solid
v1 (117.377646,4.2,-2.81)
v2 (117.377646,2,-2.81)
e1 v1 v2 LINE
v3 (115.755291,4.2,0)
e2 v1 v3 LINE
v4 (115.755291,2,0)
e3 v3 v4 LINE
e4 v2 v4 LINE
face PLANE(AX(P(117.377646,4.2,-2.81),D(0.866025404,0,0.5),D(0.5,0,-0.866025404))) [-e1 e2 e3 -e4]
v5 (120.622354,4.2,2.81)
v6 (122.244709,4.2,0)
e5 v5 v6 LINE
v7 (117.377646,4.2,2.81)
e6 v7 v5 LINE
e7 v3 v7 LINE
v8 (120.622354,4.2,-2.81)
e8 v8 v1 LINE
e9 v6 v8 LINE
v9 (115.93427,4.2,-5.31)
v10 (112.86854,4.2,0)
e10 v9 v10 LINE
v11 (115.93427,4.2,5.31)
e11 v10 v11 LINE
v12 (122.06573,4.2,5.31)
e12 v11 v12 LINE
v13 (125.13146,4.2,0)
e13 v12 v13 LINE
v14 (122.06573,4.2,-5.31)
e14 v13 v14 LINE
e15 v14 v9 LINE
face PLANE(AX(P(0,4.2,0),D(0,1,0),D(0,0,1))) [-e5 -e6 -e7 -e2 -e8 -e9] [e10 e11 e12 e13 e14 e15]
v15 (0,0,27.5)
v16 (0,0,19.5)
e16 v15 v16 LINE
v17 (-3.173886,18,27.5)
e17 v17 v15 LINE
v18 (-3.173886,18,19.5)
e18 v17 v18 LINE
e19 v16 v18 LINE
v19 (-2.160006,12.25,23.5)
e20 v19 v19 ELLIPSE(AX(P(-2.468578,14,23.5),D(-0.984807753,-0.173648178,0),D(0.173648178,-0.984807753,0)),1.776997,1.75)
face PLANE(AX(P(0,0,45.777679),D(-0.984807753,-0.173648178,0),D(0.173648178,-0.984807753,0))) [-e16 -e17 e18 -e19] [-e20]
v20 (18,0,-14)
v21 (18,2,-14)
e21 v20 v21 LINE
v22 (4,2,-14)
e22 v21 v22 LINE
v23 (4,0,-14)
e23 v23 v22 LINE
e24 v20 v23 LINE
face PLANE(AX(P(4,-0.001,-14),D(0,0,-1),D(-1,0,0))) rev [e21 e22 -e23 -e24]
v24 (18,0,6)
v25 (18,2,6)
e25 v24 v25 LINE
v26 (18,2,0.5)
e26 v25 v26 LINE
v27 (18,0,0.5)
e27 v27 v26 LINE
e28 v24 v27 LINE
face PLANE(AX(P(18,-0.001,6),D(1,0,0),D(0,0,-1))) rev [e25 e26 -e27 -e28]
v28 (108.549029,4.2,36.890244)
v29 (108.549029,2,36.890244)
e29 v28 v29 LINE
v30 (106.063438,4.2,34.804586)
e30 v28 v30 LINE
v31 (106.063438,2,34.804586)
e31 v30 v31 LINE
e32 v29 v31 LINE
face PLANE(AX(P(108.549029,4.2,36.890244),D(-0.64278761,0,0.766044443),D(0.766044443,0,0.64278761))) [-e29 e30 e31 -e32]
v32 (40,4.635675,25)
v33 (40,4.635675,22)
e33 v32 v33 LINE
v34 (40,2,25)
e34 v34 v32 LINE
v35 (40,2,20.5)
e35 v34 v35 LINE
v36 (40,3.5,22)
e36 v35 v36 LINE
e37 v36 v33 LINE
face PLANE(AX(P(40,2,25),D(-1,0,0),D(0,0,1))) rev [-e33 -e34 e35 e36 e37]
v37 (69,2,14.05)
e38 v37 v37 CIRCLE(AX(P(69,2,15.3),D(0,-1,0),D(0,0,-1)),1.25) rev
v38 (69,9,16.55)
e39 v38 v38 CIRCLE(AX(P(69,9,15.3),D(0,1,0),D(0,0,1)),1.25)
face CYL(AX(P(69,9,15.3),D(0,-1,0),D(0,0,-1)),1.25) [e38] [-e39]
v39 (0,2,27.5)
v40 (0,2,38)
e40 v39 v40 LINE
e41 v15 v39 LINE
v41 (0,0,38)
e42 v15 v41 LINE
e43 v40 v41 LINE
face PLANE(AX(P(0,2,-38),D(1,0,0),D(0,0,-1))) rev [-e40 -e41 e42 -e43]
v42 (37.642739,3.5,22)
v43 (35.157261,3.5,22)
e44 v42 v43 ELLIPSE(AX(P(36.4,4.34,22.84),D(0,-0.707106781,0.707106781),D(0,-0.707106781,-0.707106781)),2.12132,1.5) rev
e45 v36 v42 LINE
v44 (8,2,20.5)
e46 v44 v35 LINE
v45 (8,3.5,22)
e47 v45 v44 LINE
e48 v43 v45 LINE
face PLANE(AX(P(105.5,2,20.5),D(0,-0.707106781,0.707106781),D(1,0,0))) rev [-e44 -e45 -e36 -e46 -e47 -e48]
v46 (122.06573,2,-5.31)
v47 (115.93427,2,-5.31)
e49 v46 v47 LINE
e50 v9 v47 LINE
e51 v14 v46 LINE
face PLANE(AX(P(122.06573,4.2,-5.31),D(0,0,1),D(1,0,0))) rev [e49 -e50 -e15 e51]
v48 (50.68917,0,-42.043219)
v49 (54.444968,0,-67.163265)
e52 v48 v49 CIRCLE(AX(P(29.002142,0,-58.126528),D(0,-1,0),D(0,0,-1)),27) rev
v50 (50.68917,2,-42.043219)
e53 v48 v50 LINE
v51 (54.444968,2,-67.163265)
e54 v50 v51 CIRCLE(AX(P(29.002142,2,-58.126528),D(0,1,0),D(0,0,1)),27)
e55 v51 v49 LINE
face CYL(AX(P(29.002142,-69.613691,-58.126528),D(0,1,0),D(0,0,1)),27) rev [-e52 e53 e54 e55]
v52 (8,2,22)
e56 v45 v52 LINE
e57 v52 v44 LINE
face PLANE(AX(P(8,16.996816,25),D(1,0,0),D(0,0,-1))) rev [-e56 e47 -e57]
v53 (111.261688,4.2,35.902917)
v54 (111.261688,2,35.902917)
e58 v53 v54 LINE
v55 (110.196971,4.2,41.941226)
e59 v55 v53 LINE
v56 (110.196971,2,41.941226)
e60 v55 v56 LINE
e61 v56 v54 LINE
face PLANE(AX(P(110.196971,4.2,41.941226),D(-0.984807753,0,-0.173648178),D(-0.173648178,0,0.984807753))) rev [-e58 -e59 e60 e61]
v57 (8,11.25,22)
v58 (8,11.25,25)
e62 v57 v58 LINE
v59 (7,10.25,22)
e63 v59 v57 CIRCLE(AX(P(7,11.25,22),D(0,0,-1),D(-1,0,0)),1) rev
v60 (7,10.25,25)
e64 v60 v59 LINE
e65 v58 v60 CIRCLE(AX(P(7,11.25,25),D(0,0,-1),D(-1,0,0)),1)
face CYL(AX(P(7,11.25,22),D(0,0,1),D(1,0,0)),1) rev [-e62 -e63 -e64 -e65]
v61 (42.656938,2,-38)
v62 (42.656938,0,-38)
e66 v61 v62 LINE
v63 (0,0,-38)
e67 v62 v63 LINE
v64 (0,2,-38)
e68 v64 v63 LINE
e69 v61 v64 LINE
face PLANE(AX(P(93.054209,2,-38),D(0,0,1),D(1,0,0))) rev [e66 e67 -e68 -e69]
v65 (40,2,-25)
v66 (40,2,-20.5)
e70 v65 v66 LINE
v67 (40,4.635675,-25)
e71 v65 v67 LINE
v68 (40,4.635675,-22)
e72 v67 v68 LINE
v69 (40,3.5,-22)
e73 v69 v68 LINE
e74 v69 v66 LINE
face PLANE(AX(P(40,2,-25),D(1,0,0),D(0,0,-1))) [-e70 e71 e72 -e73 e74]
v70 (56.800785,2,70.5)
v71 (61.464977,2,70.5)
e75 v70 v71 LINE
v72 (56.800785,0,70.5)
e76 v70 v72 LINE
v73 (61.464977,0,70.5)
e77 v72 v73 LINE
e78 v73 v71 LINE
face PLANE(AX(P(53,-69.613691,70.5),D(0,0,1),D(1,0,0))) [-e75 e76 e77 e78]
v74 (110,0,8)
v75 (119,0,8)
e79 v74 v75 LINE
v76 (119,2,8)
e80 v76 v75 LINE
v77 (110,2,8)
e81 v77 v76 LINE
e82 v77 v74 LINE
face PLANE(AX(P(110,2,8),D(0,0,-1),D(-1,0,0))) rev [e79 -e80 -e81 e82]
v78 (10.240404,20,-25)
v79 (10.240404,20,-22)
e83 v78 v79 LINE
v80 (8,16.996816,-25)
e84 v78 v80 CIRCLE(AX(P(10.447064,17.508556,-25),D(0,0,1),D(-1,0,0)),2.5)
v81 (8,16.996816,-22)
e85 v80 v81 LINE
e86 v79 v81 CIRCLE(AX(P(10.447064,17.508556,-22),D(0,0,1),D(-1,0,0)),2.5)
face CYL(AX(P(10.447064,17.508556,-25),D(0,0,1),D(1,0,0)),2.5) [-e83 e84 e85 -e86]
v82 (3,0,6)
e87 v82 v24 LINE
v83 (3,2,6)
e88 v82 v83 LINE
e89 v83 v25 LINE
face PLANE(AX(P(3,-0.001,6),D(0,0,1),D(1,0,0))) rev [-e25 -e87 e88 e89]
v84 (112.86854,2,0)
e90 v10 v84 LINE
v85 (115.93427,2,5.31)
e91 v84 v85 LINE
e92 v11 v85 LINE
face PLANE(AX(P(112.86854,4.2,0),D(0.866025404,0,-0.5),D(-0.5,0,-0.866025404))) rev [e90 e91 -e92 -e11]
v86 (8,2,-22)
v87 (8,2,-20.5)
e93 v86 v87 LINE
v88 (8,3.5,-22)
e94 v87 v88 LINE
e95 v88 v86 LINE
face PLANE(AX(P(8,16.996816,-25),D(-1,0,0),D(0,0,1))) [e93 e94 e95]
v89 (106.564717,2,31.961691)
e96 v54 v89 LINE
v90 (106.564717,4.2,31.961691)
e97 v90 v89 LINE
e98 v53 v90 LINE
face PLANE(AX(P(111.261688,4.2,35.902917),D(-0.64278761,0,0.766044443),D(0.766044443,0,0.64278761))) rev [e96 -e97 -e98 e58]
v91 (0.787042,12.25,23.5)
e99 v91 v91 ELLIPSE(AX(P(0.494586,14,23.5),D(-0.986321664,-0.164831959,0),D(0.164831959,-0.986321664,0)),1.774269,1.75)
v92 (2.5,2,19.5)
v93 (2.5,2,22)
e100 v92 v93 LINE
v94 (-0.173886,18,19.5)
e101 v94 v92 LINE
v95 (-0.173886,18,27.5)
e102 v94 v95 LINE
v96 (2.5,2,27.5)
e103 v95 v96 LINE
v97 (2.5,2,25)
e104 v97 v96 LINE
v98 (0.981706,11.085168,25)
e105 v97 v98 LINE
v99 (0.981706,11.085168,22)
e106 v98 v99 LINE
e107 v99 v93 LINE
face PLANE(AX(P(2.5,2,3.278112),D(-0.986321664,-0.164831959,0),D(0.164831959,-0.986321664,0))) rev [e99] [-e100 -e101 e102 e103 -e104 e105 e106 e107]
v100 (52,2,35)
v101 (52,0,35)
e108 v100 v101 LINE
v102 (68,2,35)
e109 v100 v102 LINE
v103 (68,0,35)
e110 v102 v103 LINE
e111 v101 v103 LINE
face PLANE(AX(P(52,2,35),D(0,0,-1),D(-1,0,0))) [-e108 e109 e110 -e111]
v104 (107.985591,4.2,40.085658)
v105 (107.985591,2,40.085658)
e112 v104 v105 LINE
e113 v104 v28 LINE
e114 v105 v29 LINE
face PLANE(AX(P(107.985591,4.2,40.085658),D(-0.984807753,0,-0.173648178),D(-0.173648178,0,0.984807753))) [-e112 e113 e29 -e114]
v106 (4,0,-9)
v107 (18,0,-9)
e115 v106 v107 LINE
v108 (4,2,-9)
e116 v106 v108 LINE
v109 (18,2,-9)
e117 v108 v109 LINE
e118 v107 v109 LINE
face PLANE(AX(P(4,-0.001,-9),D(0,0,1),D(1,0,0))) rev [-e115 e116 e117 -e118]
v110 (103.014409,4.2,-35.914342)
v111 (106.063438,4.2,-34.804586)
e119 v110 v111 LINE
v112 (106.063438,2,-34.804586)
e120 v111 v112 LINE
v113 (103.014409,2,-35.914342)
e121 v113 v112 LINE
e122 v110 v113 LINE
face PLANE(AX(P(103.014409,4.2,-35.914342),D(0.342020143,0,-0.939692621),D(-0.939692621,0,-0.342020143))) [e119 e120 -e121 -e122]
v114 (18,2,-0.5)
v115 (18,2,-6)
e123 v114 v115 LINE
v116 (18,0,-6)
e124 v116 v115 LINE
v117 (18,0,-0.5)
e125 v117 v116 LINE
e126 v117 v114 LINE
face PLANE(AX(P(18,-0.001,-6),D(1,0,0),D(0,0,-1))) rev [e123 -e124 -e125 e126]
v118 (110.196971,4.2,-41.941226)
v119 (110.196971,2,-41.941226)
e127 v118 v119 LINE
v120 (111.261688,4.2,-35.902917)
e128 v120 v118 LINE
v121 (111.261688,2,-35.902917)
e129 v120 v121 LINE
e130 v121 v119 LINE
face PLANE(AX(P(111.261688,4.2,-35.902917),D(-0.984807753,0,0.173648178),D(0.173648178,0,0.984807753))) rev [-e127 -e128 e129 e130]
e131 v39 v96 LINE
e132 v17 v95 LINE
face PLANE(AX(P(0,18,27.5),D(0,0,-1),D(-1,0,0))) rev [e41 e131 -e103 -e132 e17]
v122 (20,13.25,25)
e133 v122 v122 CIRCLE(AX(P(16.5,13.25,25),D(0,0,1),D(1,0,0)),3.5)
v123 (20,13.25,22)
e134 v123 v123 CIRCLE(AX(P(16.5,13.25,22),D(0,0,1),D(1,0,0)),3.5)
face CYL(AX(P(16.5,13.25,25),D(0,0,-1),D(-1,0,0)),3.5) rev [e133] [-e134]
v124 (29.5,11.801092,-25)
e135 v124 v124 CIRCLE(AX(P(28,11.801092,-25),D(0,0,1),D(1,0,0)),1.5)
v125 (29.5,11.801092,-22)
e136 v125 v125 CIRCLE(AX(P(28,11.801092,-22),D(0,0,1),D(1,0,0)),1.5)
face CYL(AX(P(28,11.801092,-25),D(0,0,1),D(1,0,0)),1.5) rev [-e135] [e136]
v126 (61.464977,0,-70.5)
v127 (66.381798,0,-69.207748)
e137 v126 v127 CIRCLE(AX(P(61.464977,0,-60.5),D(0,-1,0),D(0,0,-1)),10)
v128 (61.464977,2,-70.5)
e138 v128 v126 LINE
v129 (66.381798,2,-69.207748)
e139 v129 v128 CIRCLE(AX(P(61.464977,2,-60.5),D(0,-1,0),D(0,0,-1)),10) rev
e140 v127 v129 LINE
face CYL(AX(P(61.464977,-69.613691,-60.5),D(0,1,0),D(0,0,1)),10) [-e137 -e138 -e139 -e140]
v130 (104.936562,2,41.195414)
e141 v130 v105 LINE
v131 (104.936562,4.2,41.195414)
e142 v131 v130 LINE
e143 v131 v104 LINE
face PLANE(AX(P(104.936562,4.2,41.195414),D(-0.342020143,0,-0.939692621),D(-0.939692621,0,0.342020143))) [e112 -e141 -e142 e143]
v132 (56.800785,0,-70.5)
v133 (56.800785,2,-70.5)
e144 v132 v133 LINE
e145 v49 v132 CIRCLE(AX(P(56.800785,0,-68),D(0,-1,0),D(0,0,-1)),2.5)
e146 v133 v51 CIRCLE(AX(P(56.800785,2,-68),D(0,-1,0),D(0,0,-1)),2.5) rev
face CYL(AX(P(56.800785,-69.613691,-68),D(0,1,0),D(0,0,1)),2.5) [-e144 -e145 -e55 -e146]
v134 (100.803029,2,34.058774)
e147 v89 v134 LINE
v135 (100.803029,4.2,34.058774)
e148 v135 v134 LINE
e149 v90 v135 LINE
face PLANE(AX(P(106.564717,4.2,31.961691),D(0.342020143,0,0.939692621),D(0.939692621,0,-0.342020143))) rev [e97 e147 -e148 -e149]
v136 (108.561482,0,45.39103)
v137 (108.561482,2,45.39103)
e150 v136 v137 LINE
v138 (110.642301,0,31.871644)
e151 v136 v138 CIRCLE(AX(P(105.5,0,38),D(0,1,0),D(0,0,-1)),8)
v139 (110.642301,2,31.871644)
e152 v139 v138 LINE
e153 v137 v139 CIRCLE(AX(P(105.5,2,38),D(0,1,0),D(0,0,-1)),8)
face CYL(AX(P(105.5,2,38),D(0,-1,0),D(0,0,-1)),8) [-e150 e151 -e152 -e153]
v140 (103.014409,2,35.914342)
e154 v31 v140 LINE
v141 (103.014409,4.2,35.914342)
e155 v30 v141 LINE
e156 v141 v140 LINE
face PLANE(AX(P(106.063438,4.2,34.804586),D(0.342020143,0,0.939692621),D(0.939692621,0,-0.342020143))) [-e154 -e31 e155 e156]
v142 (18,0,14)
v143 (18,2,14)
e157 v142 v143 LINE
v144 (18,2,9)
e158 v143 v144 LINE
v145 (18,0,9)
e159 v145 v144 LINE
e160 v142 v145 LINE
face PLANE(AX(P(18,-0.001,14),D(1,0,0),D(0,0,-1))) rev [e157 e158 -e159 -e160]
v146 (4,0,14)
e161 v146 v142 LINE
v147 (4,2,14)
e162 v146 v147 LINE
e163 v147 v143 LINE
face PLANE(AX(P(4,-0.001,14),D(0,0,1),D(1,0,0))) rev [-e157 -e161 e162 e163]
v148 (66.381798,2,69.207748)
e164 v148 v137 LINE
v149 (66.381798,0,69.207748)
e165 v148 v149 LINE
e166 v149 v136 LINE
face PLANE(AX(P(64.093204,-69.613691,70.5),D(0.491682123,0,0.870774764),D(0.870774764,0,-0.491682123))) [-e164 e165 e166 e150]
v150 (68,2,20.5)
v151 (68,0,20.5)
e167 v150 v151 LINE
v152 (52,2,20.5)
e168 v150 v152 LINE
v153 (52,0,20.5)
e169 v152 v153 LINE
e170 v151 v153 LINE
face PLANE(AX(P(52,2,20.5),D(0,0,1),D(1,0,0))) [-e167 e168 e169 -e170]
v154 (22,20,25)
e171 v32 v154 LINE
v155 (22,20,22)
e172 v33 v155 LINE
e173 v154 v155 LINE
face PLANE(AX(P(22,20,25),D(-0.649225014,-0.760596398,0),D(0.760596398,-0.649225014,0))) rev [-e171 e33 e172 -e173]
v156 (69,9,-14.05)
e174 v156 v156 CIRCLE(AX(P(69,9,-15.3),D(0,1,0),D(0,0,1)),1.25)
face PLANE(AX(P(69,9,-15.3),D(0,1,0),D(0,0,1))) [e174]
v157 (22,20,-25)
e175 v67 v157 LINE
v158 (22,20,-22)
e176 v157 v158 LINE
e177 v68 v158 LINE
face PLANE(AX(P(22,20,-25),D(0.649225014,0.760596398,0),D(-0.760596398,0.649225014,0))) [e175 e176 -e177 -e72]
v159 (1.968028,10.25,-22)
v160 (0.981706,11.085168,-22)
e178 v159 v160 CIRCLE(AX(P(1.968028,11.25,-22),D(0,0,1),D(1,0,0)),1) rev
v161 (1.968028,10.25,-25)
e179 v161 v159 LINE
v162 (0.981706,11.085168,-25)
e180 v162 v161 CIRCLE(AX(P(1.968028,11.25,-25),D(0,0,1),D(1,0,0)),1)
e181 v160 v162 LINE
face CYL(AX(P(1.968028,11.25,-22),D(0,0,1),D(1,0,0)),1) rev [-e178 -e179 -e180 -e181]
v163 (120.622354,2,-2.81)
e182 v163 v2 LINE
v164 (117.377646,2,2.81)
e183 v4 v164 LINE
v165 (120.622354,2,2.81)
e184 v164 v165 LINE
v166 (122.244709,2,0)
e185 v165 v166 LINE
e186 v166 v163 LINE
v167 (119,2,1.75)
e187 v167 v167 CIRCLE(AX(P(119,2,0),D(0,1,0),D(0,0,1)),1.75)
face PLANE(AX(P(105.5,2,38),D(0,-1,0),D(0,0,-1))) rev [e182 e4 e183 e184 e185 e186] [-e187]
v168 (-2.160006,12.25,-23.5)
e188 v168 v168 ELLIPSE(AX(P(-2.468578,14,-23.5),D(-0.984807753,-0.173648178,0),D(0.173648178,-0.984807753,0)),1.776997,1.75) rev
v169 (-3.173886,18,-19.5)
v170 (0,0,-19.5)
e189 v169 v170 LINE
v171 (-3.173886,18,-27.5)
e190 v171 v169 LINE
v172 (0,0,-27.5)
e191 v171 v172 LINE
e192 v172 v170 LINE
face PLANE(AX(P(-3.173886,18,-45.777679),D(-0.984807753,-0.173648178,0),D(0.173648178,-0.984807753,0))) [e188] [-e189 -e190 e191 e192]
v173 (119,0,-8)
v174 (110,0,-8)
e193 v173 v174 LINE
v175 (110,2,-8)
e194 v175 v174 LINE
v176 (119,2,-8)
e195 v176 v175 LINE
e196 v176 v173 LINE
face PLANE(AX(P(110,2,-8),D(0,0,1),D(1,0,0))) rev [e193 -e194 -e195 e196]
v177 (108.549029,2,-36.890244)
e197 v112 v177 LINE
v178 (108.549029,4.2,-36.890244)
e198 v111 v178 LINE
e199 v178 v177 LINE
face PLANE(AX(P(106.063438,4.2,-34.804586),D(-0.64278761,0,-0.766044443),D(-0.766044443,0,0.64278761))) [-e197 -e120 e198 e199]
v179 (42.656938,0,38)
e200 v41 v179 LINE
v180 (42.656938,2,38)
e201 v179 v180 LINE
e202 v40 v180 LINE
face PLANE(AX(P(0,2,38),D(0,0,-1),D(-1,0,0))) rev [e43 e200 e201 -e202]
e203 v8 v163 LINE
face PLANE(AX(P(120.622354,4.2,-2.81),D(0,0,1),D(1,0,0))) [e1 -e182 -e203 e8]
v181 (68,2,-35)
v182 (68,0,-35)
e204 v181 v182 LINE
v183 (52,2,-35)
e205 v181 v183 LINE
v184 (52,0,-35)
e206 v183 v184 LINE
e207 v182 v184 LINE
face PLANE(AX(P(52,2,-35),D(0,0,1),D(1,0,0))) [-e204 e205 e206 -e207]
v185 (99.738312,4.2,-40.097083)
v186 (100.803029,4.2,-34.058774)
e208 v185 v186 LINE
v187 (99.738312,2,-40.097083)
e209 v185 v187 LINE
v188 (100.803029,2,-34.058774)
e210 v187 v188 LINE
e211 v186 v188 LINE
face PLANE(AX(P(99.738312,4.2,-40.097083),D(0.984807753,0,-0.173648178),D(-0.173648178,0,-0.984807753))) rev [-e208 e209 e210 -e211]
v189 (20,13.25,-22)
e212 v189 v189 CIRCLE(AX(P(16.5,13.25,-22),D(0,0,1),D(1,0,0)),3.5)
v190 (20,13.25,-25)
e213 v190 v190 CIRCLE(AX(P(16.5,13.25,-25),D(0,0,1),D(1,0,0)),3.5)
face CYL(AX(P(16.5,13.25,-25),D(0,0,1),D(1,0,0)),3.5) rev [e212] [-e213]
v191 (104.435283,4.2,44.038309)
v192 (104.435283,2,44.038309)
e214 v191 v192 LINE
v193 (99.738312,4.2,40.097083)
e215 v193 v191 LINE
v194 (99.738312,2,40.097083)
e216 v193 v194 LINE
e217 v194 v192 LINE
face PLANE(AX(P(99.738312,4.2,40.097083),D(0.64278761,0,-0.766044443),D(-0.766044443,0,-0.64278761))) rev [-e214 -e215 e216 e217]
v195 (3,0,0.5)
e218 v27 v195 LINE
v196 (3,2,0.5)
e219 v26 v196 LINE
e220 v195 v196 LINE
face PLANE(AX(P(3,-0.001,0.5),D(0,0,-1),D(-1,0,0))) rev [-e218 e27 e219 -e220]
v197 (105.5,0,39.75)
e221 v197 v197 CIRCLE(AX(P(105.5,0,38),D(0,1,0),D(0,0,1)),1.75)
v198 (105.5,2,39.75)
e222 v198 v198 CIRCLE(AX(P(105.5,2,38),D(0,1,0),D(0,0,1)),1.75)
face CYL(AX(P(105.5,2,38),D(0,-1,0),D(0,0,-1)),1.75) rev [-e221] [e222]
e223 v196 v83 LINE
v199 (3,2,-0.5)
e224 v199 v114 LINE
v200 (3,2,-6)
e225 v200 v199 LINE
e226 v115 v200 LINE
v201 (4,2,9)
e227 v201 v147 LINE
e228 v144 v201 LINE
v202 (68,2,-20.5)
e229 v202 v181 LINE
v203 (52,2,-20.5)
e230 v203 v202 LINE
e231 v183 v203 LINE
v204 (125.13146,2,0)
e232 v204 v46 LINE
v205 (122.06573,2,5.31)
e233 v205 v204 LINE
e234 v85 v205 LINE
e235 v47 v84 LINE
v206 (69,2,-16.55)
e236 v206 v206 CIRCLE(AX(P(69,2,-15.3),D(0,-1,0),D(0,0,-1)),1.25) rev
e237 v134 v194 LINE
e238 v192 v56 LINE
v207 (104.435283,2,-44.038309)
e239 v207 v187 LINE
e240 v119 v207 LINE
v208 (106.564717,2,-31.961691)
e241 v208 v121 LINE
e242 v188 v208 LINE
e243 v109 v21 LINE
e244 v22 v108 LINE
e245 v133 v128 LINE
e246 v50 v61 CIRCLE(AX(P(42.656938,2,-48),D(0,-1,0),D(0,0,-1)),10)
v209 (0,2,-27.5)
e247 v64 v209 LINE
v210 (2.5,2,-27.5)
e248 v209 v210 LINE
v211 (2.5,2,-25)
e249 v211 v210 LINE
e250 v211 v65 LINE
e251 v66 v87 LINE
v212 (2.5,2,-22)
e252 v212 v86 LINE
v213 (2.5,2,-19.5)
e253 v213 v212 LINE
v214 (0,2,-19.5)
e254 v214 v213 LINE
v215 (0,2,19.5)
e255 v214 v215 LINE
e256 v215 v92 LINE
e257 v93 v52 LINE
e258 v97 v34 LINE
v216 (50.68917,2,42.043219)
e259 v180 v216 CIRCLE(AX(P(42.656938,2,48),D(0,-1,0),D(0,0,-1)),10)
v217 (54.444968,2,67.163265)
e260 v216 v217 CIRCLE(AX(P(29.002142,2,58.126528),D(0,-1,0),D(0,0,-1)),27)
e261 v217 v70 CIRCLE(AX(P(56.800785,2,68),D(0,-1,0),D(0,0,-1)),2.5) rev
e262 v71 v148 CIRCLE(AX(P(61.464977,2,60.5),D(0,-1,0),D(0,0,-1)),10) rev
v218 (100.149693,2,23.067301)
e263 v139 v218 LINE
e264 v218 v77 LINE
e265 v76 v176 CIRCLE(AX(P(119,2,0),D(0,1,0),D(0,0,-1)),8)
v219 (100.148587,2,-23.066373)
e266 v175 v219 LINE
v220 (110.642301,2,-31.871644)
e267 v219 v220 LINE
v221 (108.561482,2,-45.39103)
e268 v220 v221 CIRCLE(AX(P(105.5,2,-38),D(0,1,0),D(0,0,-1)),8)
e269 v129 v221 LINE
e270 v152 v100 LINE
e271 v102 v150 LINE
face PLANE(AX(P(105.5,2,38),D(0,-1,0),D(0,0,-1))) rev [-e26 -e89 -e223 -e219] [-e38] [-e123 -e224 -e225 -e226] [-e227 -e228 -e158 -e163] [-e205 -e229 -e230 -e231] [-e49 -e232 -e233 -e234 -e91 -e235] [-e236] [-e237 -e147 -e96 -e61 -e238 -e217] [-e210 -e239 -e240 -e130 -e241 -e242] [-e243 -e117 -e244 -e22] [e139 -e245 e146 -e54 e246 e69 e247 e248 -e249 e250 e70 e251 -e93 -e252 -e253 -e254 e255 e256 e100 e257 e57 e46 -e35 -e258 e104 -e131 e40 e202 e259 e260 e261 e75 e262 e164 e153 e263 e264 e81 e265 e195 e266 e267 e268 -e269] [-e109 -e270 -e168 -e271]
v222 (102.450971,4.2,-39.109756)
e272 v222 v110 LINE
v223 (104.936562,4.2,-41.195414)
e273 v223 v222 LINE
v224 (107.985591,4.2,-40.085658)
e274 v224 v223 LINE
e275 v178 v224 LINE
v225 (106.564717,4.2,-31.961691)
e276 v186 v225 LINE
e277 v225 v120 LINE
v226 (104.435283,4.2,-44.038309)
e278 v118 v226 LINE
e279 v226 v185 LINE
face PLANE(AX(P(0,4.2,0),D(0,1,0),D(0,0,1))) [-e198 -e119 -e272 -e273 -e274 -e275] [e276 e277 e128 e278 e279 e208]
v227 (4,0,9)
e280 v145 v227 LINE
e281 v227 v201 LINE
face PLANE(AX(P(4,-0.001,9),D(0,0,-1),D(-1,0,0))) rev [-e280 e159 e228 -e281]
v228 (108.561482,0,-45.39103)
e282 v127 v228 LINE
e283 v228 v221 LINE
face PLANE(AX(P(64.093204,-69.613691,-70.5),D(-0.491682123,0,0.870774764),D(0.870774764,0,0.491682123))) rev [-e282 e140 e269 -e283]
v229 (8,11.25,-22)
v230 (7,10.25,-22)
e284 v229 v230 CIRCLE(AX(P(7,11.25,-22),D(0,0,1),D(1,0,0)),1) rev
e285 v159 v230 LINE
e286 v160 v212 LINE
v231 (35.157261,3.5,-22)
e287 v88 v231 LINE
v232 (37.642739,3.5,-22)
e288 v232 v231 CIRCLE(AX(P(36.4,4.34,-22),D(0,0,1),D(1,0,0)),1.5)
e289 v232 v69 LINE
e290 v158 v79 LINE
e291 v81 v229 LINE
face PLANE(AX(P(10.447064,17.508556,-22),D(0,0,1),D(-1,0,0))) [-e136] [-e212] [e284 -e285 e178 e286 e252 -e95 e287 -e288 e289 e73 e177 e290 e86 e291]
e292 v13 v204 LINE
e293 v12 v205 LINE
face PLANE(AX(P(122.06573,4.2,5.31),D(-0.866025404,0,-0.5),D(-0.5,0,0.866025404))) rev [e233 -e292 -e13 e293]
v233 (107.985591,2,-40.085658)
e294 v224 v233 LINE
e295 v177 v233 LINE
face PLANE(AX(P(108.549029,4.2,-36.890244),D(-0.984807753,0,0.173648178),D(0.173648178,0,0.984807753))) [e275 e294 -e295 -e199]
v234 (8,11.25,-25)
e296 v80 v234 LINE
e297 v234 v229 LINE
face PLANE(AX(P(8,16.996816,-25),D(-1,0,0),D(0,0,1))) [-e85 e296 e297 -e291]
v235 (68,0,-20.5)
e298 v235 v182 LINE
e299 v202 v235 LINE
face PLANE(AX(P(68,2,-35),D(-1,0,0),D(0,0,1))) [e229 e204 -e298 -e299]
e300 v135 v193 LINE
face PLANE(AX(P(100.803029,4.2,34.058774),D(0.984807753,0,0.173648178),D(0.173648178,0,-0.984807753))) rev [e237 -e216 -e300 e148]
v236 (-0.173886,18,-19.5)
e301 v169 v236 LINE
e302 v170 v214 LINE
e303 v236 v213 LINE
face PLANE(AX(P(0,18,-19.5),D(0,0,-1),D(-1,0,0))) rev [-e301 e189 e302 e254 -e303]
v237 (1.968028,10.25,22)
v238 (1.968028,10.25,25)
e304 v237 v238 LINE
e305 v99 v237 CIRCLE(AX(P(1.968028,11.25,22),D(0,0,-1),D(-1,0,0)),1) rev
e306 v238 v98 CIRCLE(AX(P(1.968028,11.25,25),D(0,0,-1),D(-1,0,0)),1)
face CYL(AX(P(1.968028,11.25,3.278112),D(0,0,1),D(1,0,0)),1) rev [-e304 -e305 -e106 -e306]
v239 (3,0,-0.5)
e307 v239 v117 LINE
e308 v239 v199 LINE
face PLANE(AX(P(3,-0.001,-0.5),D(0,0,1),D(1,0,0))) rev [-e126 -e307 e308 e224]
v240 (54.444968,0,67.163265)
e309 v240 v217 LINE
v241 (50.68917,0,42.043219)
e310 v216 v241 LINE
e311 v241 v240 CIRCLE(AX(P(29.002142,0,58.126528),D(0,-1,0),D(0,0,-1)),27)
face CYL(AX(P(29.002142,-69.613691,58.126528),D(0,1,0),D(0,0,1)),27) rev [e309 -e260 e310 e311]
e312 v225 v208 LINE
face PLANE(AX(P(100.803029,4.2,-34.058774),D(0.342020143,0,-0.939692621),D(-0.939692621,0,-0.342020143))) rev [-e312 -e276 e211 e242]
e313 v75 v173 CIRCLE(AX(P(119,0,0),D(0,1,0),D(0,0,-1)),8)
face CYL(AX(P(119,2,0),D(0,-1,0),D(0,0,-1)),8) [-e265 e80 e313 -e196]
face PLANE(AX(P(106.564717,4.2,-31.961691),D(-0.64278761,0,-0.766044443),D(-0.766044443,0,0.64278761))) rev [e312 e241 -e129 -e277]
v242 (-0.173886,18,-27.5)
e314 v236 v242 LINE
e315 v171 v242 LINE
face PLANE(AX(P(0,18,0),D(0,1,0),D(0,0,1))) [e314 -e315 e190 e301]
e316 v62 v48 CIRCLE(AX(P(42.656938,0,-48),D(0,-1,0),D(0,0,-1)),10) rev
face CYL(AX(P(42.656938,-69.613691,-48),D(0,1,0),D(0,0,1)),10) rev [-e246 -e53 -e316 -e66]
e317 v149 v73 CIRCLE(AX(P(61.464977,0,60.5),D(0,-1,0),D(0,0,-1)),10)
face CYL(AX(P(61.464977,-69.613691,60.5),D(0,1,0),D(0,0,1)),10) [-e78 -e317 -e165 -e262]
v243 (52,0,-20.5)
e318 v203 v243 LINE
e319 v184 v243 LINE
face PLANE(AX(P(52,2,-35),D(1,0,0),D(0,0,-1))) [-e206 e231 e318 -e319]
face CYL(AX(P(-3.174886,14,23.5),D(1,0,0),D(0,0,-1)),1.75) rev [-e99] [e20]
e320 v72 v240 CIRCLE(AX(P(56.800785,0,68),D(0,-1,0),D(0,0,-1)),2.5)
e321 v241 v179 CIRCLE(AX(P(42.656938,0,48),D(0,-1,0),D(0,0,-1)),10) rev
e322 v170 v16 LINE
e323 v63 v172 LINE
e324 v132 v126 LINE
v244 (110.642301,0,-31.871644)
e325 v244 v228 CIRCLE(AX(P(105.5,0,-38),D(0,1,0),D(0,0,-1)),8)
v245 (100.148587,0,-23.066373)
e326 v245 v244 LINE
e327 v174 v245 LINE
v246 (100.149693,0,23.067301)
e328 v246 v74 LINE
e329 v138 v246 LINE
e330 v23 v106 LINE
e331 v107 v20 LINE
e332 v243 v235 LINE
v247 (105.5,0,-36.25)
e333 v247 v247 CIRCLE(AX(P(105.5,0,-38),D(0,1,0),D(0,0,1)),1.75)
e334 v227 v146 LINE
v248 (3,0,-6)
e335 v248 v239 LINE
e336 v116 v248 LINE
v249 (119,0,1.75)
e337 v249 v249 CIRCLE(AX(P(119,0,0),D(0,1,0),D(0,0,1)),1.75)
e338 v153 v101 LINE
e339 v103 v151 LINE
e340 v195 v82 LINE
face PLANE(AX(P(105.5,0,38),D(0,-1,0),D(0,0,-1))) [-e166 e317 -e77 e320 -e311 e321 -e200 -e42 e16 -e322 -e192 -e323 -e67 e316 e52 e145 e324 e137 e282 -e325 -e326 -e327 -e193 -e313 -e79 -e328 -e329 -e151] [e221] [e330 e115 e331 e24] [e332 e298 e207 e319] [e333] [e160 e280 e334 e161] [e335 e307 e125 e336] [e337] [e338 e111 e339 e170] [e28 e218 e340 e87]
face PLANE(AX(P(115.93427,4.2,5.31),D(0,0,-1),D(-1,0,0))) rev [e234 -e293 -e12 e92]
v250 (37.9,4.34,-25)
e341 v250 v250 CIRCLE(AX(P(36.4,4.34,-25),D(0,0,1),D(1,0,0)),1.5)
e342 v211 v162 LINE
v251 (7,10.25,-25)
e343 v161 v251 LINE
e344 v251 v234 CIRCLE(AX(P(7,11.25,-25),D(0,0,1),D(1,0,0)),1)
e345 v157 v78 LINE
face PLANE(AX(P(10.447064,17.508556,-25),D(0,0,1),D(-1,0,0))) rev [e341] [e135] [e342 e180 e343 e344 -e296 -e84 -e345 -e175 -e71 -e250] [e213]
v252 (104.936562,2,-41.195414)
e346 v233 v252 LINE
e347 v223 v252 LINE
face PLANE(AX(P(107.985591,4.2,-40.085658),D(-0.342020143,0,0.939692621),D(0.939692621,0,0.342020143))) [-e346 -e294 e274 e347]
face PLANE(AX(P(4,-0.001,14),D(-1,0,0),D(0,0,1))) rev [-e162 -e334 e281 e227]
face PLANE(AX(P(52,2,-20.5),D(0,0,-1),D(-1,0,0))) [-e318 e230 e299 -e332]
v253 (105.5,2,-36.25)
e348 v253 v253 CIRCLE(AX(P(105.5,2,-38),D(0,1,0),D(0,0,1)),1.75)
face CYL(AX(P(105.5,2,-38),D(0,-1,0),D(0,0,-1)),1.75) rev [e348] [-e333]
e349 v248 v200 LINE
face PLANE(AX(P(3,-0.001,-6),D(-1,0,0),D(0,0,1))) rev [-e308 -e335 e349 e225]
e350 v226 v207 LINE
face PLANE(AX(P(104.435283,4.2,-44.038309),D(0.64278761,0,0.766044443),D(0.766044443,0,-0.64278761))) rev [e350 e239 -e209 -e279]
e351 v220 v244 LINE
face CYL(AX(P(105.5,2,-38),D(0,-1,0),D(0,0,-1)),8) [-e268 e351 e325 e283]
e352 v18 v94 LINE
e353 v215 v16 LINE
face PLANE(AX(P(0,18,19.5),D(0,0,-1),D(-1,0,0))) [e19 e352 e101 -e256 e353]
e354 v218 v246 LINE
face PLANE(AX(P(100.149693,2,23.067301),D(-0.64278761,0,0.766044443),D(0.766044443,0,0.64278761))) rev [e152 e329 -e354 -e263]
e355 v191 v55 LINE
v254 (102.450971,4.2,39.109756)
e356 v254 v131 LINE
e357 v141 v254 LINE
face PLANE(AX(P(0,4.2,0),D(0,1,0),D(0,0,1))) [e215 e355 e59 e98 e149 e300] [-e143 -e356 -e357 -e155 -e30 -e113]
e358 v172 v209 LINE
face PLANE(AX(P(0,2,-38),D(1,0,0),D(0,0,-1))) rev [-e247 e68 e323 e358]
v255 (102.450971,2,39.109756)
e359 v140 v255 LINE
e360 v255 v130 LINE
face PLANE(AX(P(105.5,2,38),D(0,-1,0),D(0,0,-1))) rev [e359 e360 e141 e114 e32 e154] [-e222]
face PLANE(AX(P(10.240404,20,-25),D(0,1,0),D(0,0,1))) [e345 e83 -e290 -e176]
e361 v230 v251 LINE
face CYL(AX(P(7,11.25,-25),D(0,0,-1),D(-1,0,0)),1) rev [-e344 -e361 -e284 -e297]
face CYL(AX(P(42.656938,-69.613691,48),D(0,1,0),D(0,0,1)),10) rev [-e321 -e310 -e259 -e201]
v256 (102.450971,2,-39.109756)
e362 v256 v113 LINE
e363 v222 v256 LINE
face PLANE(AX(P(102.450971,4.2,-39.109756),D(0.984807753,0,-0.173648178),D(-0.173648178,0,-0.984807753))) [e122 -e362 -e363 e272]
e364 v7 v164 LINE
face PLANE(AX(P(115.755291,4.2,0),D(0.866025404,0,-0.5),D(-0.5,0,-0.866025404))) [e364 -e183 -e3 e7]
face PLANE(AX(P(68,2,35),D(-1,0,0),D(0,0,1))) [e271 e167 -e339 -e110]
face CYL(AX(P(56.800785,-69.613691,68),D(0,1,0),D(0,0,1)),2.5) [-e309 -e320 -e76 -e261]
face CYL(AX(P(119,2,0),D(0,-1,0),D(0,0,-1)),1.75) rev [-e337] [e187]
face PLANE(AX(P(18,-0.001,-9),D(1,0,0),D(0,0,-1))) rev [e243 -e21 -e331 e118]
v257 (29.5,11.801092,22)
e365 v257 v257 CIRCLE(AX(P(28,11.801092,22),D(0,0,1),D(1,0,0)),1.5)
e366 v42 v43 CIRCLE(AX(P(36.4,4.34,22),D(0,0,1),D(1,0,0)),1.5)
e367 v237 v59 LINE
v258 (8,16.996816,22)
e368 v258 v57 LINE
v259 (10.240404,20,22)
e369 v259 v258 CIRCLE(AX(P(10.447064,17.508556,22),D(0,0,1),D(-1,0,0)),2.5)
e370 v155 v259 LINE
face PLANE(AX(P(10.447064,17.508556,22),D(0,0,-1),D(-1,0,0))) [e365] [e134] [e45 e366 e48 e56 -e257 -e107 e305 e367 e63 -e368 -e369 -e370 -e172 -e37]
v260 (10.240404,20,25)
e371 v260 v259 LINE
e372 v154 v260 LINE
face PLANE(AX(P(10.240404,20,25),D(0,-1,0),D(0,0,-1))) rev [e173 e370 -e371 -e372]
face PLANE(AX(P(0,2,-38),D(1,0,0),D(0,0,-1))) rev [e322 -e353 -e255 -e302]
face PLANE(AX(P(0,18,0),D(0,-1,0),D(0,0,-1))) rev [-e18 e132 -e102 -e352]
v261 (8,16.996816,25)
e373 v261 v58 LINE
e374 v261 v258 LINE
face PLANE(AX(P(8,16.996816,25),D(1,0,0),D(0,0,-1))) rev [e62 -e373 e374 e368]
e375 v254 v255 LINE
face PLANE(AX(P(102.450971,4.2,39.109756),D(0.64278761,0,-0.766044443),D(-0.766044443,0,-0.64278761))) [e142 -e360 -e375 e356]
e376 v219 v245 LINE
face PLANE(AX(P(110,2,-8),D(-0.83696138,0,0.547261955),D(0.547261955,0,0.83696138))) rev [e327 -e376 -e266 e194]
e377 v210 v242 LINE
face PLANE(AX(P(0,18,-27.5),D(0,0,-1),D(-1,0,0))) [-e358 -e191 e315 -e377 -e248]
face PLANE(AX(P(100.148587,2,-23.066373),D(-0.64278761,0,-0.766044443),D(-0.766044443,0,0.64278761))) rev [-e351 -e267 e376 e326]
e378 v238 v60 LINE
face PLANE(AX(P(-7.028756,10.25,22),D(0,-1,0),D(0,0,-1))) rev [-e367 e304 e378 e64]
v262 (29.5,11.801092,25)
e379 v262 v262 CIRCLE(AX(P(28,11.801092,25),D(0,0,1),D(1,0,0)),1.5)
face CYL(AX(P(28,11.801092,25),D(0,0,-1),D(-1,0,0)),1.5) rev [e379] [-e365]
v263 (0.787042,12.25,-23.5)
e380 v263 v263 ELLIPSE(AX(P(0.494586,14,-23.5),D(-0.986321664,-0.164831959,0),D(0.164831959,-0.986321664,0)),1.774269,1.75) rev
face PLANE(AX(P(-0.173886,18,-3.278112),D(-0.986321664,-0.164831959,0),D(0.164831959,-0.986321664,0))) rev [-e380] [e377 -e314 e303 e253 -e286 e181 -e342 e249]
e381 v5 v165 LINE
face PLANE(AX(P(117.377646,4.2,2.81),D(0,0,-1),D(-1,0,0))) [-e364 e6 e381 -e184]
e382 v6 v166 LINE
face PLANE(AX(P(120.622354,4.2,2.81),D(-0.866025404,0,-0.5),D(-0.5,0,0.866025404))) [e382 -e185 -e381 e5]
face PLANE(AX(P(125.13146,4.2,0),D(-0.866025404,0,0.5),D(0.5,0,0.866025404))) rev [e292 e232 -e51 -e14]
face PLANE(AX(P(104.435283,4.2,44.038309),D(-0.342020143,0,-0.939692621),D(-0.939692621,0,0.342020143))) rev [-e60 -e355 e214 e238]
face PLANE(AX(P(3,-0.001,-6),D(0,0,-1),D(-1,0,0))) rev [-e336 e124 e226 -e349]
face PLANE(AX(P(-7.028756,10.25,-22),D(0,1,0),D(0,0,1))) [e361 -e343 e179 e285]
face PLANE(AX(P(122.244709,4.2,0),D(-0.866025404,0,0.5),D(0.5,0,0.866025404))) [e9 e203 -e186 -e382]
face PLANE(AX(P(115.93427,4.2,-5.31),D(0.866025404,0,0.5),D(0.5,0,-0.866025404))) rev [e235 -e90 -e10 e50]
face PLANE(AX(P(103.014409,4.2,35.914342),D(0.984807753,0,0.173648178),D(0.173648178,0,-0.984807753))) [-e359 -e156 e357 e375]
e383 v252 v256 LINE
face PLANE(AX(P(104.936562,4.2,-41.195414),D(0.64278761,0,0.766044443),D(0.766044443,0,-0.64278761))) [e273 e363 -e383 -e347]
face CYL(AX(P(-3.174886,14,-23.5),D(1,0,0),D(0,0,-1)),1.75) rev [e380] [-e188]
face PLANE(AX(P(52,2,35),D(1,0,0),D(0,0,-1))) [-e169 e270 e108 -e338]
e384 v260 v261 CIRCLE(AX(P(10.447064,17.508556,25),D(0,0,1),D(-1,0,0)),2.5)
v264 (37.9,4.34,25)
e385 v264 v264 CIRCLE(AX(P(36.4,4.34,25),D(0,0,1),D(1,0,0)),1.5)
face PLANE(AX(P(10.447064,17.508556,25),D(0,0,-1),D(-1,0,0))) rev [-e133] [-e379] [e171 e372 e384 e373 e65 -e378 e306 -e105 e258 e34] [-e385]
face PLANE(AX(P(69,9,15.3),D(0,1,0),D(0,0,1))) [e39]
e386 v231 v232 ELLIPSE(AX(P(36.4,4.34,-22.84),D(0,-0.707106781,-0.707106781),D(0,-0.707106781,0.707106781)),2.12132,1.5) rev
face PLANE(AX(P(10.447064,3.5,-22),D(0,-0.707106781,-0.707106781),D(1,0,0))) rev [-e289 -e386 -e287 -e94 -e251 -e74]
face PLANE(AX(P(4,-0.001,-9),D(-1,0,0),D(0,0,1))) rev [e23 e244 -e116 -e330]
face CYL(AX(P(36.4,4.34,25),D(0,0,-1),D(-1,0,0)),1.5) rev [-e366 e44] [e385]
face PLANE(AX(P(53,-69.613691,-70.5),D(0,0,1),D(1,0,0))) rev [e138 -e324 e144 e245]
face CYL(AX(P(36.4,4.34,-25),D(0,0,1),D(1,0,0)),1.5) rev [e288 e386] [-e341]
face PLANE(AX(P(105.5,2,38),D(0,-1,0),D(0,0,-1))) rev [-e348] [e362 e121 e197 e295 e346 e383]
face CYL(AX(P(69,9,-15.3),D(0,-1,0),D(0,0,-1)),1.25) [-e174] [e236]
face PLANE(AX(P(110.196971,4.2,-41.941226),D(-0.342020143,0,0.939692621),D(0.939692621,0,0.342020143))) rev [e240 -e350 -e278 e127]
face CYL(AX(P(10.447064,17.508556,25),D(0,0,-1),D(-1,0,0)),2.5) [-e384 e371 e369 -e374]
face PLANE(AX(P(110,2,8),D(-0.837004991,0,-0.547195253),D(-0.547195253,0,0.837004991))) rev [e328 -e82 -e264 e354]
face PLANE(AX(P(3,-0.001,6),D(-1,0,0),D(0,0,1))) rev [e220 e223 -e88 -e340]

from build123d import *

# Parameters (mm, degrees)
ESBO_O1_R                  = 1.75
ESBO_O1_W                  = 16
ESBO_O1_H                  = 14.5
RESSALTO_EXTRUS_O1_DEPTH   = 2
RESSALTO_EXTRUS_O9_DEPTH   = 2.2
ESBO_O3_W                  = 2.5
ESBO_O3_H                  = 8
RESSALTO_EXTRUS_O3_DEPTH   = 9
ESBO_O3_3_W                = 2.5
ESBO_O3_3_H                = 8
RESSALTO_EXTRUS_O7_DEPTH   = 16
RESSALTO_EXTRUS_O8_DEPTH   = 8
RESSALTO_EXTRUS_O10_DEPTH  = 8
RESSALTO_EXTRUS_O4_START   = -16
ESBO_O4_R                  = 3.5
ESBO_O4_R_2                = 1.5
RESSALTO_EXTRUS_O4_DEPTH   = 3
CHANFRO1_SIZE              = 1.5
RESSALTO_EXTRUS_O15_DEPTH  = 2
FILETE2_R                  = 2.5
CHANFRO1_OF_ESPELHAR1_SIZE = 1.5
FILETE2_OF_ESPELHAR1_R     = 2.5
FILETE3_R                  = 10
CORTE_EXTRUS_O1_REACH      = 146.466
ESBO_O6_R                  = 1.75
CORTE_EXTRUS_O3_DEPTH      = 8
CORTE_EXTRUS_O4_DEPTH      = 8
RESSALTO_EXTRUS_O14_REACH  = 141.754
ESBO_O18_W                 = 3
ESBO_O18_H                 = 8.25
FILETE1_R                  = 1
ESBO_O8_R                  = 1.25
RESSALTO_EXTRUS_O6_DEPTH   = 7
CORTE_EXTRUS_O2_REACH      = 148.367
ESBO_O9_W                  = 14
ESBO_O9_H                  = 5
ESBO_O9_W_2                = 15
ESBO_O9_H_2                = 5.5
ESBO_O20_W                 = 2.5
ESBO_O20_H                 = 9
CORTE_EXTRUS_O5_DEPTH      = 31


with BuildPart() as part:
    # Esboço1 → Ressalto-extrusão1 (new body)
    with BuildSketch(Plane(origin=(0, 0, 0), x_dir=(1, 0, 0), z_dir=(0, 1, 0))):
        with BuildLine():
            Line((93.054209385, 38), (0, 38))
            Line((0, 38), (0, -38))
            Line((0, -38), (93.054209385, -38))
            Line((93.054209385, -38), (100.357699123, -44.128355545))
            ThreePointArc((100.357699123, -44.128355545), (111.628355545, -43.142300877), (110.642300877, -31.871644455))
            Line((110.642300877, -31.871644455), (100.149693398, -23.067301389))
            Line((100.149693398, -23.067301389), (110, -8))
            Line((110, -8), (119, -8))
            ThreePointArc((119, -8), (127, 0), (119, 8))
            Line((119, 8), (110, 8))
            Line((110, 8), (100.148586591, 23.066372668))
            Line((100.148586591, 23.066372668), (110.642300877, 31.871644455))
            ThreePointArc((110.642300877, 31.871644455), (111.628355545, 43.142300877), (100.357699123, 44.128355545))
            Line((100.357699123, 44.128355545), (93.054209385, 38))
        make_face()
        with Locations(Location((105.5, -38, 0), (0, 0, 270))):
            Circle(ESBO_O1_R, mode=Mode.SUBTRACT)
        with Locations(Location((105.5, 38, 0), (0, 0, 270))):
            Circle(ESBO_O1_R, mode=Mode.SUBTRACT)
        with Locations(Location((119, 0, 0), (0, 0, 270))):
            Circle(ESBO_O1_R, mode=Mode.SUBTRACT)
        with Locations((60, -27.75)):
            Rectangle(ESBO_O1_W, ESBO_O1_H, mode=Mode.SUBTRACT)
        with Locations((60, 27.75)):
            Rectangle(ESBO_O1_W, ESBO_O1_H, mode=Mode.SUBTRACT)
    extrude(amount=RESSALTO_EXTRUS_O1_DEPTH)

    # Esboço11 → Ressalto-extrusão9 (add)
    # profile 1 of 3: a face of its own
    with BuildSketch(Plane(origin=(0, 2, 0), x_dir=(1, 0, 0), z_dir=(0, 1, 0))):
        Polygon((99.738312416, -40.09708278), (104.435283169, -44.038309206), (110.196970753, -41.941226427), (111.261687584, -35.90291722), (106.564716831, -31.961690794), (100.803029247, -34.058773573), align=None)
        Polygon((107.985590926, -40.085658429), (108.549028646, -36.890244329), (106.06343772, -34.8045859), (103.014409074, -35.914341571), (102.450971354, -39.109755671), (104.93656228, -41.1954141), align=None, mode=Mode.SUBTRACT)
    # profile 2 of 3: a face of its own
    with BuildSketch(Plane(origin=(0, 2, 0), x_dir=(1, 0, 0), z_dir=(0, 1, 0))):
        Polygon((115.934270071, -5.31), (122.065729929, -5.31), (125.131459859, 0), (122.065729929, 5.31), (115.934270071, 5.31), (112.868540141, 0), align=None)
        Polygon((122.244708513, 0), (120.622354256, 2.81), (117.377645744, 2.81), (115.755291487, 0), (117.377645744, -2.81), (120.622354256, -2.81), align=None, mode=Mode.SUBTRACT)
    # profile 3 of 3: a face of its own
    with BuildSketch(Plane(origin=(0, 2, 0), x_dir=(1, 0, 0), z_dir=(0, 1, 0))):
        Polygon((100.803029247, 34.058773573), (106.564716831, 31.961690794), (111.261687584, 35.90291722), (110.196970753, 41.941226427), (104.435283169, 44.038309206), (99.738312416, 40.09708278), align=None)
        Polygon((107.985590926, 40.085658429), (104.93656228, 41.1954141), (102.450971354, 39.109755671), (103.014409074, 35.914341571), (106.06343772, 34.8045859), (108.549028646, 36.890244329), align=None, mode=Mode.SUBTRACT)
    extrude(amount=RESSALTO_EXTRUS_O9_DEPTH)

    # Esboço3 → Ressalto-extrusão3 (add)
    with BuildSketch(Plane(origin=(0, 2, 0), x_dir=(1, 0, 0), z_dir=(0, 1, 0))):
        with Locations((1.25, -11.5)):
            Rectangle(ESBO_O3_W, ESBO_O3_H)
        with Locations((1.25, 11.5)):
            Rectangle(ESBO_O3_W, ESBO_O3_H)
    extrude(amount=RESSALTO_EXTRUS_O3_DEPTH)

    # Esboço3<3> → Ressalto-extrusão7 (add)
    with BuildSketch(Plane(origin=(0, 2, 0), x_dir=(1, 0, 0), z_dir=(0, 1, 0))):
        with Locations((1.25, -23.5)):
            Rectangle(ESBO_O3_3_W, ESBO_O3_3_H)
        with Locations((1.25, 23.5)):
            Rectangle(ESBO_O3_3_W, ESBO_O3_3_H)
    extrude(amount=RESSALTO_EXTRUS_O7_DEPTH)

    # Esboço10 → Ressalto-extrusão8 (add)
    with BuildSketch(Plane(origin=(0, 0, 19.5), x_dir=(-1, 0, 0), z_dir=(0, 0, -1))):
        Polygon((0, 18), (0, 0), (3.173885653, 18), align=None)
    extrude(amount=-RESSALTO_EXTRUS_O8_DEPTH)

    # Esboço12 → Ressalto-extrusão10 (add)
    with BuildSketch(Plane.XY.offset(-19.5)):
        Polygon((0, 18), (-3.173885653, 18), (0, 0), align=None)
    extrude(amount=-RESSALTO_EXTRUS_O10_DEPTH)

    # Esboço4 → Ressalto-extrusão4 (add)
    with BuildSketch(Plane.XY.offset(38).offset(RESSALTO_EXTRUS_O4_START)):
        with BuildLine():
            Line((22, 20), (40, 4.635674992))
            Line((40, 4.635674992), (40, 2))
            Line((40, 2), (8, 2))
            Line((8, 2), (8, 16.996816315))
            ThreePointArc((8, 16.996816315), (8.443232576, 19.003434084), (10.240404344, 20))
            Line((10.240404344, 20), (22, 20))
        make_face()
        with Locations((16.5, 13.25)):
            Circle(ESBO_O4_R, mode=Mode.SUBTRACT)
        with Locations((28, 11.801092343)):
            Circle(ESBO_O4_R_2, mode=Mode.SUBTRACT)
        with Locations((36.4, 4.34)):
            Circle(ESBO_O4_R_2, mode=Mode.SUBTRACT)
    ressalto_extrus_o4 = extrude(amount=RESSALTO_EXTRUS_O4_DEPTH)

    # Chanfro1
    # the kernel refuses this chamfer: 1.5 mm, written as the material it adds along each edge
    with BuildSketch(Plane(origin=(40, 2, 22), x_dir=(0, -0.027495876610586334, -0.9996219169112968), z_dir=(-1, 0, 0))) as chanfro1_piece_1_section:
        Polygon((CHANFRO1_SIZE * 0.999621916911, -CHANFRO1_SIZE * 0.0274958766106), (-CHANFRO1_SIZE * 0.0274958766106, -CHANFRO1_SIZE * 0.999621916911), (0, 0), align=None)
    chanfro1_piece_1 = extrude(amount=32, mode=Mode.PRIVATE)
    chanfro1_piece_1 = chanfro1_piece_1 - Plane(origin=(36.4, 4.34, 21.50204414), x_dir=(1, 0, 0), z_dir=(0, 0, -1)) * Cylinder(1.5, 70, mode=Mode.PRIVATE)
    add(chanfro1_piece_1)

    # Esboço21 → Ressalto-extrusão15 (add)
    with BuildSketch(Plane(origin=(0, 2, 0), x_dir=(1, 0, 0), z_dir=(0, 1, 0))):
        with BuildLine():
            Line((53, -70.5), (64.093204136, -70.5))
            Line((64.093204136, -70.5), (108.561481673, -45.391030373))
            Line((108.561481673, -45.391030373), (103.358833516, -45.391030373))
            Line((103.358833516, -45.391030373), (95.364049773, -38))
            Line((95.364049773, -38), (47, -38))
            ThreePointArc((47, -38), (55.553461033, -53.224745655), (53, -70.5))
        make_face()
    ressalto_extrus_o15 = extrude(amount=-RESSALTO_EXTRUS_O15_DEPTH)

    # Filete2
    filete2_edges = [part.edges().sort_by_distance(p)[0] for p in [
        (53, 1, 70.5),
    ]]
    fillet(filete2_edges, radius=FILETE2_R)

    # Espelhar1: Ressalto-extrusão4, Ressalto-extrusão15 across plane
    add(ressalto_extrus_o4.mirror(Plane.XY))
    add(ressalto_extrus_o15.mirror(Plane.XY))

    # Chanfro1 of Espelhar1
    # the kernel refuses this chamfer: 1.5 mm, written as the material it adds along each edge
    with BuildSketch(Plane(origin=(40, 2, -22), x_dir=(0, -0.027495876610586334, 0.9996219169112968), z_dir=(-1, 0, 0))) as chanfro1_of_espelhar1_piece_1_section:
        Polygon((CHANFRO1_OF_ESPELHAR1_SIZE * 0.999621916911, CHANFRO1_OF_ESPELHAR1_SIZE * 0.0274958766106), (-CHANFRO1_OF_ESPELHAR1_SIZE * 0.0274958766106, CHANFRO1_OF_ESPELHAR1_SIZE * 0.999621916911), (0, 0), align=None)
    chanfro1_of_espelhar1_piece_1 = extrude(amount=32, mode=Mode.PRIVATE)
    chanfro1_of_espelhar1_piece_1 = chanfro1_of_espelhar1_piece_1 - Plane(origin=(36.4, 4.34, -21.50204414), x_dir=(1, 0, 0), z_dir=(0, 0, 1)) * Cylinder(1.5, 70, mode=Mode.PRIVATE)
    add(chanfro1_of_espelhar1_piece_1)

    # Filete2 of Espelhar1
    filete2_of_espelhar1_edges = [part.edges().sort_by_distance(p)[0] for p in [
        (53, 1, -70.5),
    ]]
    fillet(filete2_of_espelhar1_edges, radius=FILETE2_OF_ESPELHAR1_R)

    # Filete3
    filete3_edges = [part.edges().sort_by_distance(p)[0] for p in [
        (47, 1, 38),
        (64.093204136, 1, 70.5),
        (47, 1, -38),
        (64.093204136, 1, -70.5),
    ]]
    fillet(filete3_edges, radius=FILETE3_R)

    # Esboço6 → Corte-extrusão1 (cut, up to next)
    with BuildSketch(Plane.ZY.offset(-2.5), mode=Mode.PRIVATE) as corte_extrus_o1_sk1:
        with Locations(Location((11.5, 7, 0), (0, 0, 180))):
            Circle(ESBO_O6_R)
    corte_extrus_o1_tool1 = extrude(corte_extrus_o1_sk1.sketch, amount=CORTE_EXTRUS_O1_REACH, mode=Mode.PRIVATE) & part.part
    # Esboço6 → Corte-extrusão1 (cut, up to next)
    with BuildSketch(Plane.ZY.offset(-2.5), mode=Mode.PRIVATE) as corte_extrus_o1_sk2:
        with Locations(Location((23.5, 14, 0), (0, 0, 270))):
            Circle(ESBO_O6_R)
    corte_extrus_o1_tool2 = extrude(corte_extrus_o1_sk2.sketch, amount=CORTE_EXTRUS_O1_REACH, mode=Mode.PRIVATE) & part.part
    corte_extrus_o1_1 = corte_extrus_o1_tool1.solids().sort_by_distance((2.5, 7, 11.5))[0]
    add(corte_extrus_o1_1, mode=Mode.SUBTRACT)
    corte_extrus_o1_2 = corte_extrus_o1_tool2.solids().sort_by_distance((2.5, 14, 23.5))[0]
    add(corte_extrus_o1_2, mode=Mode.SUBTRACT)
    corte_extrus_o1 = corte_extrus_o1_1 + corte_extrus_o1_2  # Corte-extrusão1 as one shape, for the pattern or mirror that repeats it

    # Esboço15 → Corte-extrusão3 (cut)
    with BuildSketch(Plane.XY.offset(27.5)):
        Polygon((-0.173885653, 18), (2.5, 18), (2.5, 2), align=None)
    extrude(amount=-CORTE_EXTRUS_O3_DEPTH, mode=Mode.SUBTRACT)

    # Esboço16 → Corte-extrusão4 (cut)
    with BuildSketch(Plane(origin=(0, 0, -27.5), x_dir=(-1, 0, 0), z_dir=(0, 0, -1))):
        Polygon((-2.5, 18), (0.173885653, 18), (-2.5, 2), align=None)
    extrude(amount=-CORTE_EXTRUS_O4_DEPTH, mode=Mode.SUBTRACT)

    # Ressalto-extrusão14: up to this plane
    ressalto_extrus_o14_end = Plane(origin=(2.5, 2, 3.278111562), z_dir=(-0.9863216641813338, -0.1648319591783229, 0))
    # Esboço18 → Ressalto-extrusão14 (add, up to the surface)
    with BuildSketch(Plane.ZY.offset(-8), mode=Mode.PRIVATE) as ressalto_extrus_o14_sk1:
        with Locations((23.5, 6.125)):
            Rectangle(ESBO_O18_W, ESBO_O18_H)
    ressalto_extrus_o14_tool1 = split(extrude(ressalto_extrus_o14_sk1.sketch, amount=RESSALTO_EXTRUS_O14_REACH, mode=Mode.PRIVATE), bisect_by=ressalto_extrus_o14_end, keep=Keep.BOTH, mode=Mode.PRIVATE)
    ressalto_extrus_o14 = ressalto_extrus_o14_tool1.solids().sort_by_distance((8, 6.125, 23.5))[0]
    add(ressalto_extrus_o14)

    # Espelhar2: Corte-extrusão1, Ressalto-extrusão14 across plane
    add(corte_extrus_o1.mirror(Plane.XY), mode=Mode.SUBTRACT)
    add(ressalto_extrus_o14.mirror(Plane.XY))

    # Filete1
    filete1_edges = [part.edges().sort_by_distance(p)[0] for p in [
        (8, 10.25, 23.5),
        (1.12127771, 10.25, 23.5),
        (8, 10.25, -23.5),
        (1.12127771, 10.25, -23.5),
    ]]
    fillet(filete1_edges, radius=FILETE1_R)

    # Esboço8 → Ressalto-extrusão6 (add)
    with BuildSketch(Plane(origin=(0, 2, 0), x_dir=(1, 0, 0), z_dir=(0, 1, 0))):
        with Locations(Location((69, -15.3, 0), (0, 0, 90))):
            Circle(ESBO_O8_R)
        with Locations(Location((69, 15.3, 0), (0, 0, 90))):
            Circle(ESBO_O8_R)
    extrude(amount=RESSALTO_EXTRUS_O6_DEPTH)

    # Esboço9 → Corte-extrusão2 (cut, up to next)
    with BuildSketch(Plane(origin=(0, 2, 0), x_dir=(1, 0, 0), z_dir=(0, 1, 0)), mode=Mode.PRIVATE) as corte_extrus_o2_sk1:
        with Locations((11, -11.5)):
            Rectangle(ESBO_O9_W, ESBO_O9_H)
    corte_extrus_o2_tool1 = extrude(corte_extrus_o2_sk1.sketch, amount=-CORTE_EXTRUS_O2_REACH, mode=Mode.PRIVATE) & part.part
    # Esboço9 → Corte-extrusão2 (cut, up to next)
    with BuildSketch(Plane(origin=(0, 2, 0), x_dir=(1, 0, 0), z_dir=(0, 1, 0)), mode=Mode.PRIVATE) as corte_extrus_o2_sk2:
        with Locations((10.5, -3.25)):
            Rectangle(ESBO_O9_W_2, ESBO_O9_H_2)
    corte_extrus_o2_tool2 = extrude(corte_extrus_o2_sk2.sketch, amount=-CORTE_EXTRUS_O2_REACH, mode=Mode.PRIVATE) & part.part
    # Esboço9 → Corte-extrusão2 (cut, up to next)
    with BuildSketch(Plane(origin=(0, 2, 0), x_dir=(1, 0, 0), z_dir=(0, 1, 0)), mode=Mode.PRIVATE) as corte_extrus_o2_sk3:
        with Locations((11, 11.5)):
            Rectangle(ESBO_O9_W, ESBO_O9_H)
    corte_extrus_o2_tool3 = extrude(corte_extrus_o2_sk3.sketch, amount=-CORTE_EXTRUS_O2_REACH, mode=Mode.PRIVATE) & part.part
    # Esboço9 → Corte-extrusão2 (cut, up to next)
    with BuildSketch(Plane(origin=(0, 2, 0), x_dir=(1, 0, 0), z_dir=(0, 1, 0)), mode=Mode.PRIVATE) as corte_extrus_o2_sk4:
        with Locations((10.5, 3.25)):
            Rectangle(ESBO_O9_W_2, ESBO_O9_H_2)
    corte_extrus_o2_tool4 = extrude(corte_extrus_o2_sk4.sketch, amount=-CORTE_EXTRUS_O2_REACH, mode=Mode.PRIVATE) & part.part
    add(corte_extrus_o2_tool1.solids().sort_by_distance((11, 2, 11.5))[0], mode=Mode.SUBTRACT)
    add(corte_extrus_o2_tool2.solids().sort_by_distance((10.5, 2, 3.25))[0], mode=Mode.SUBTRACT)
    add(corte_extrus_o2_tool3.solids().sort_by_distance((11, 2, -11.5))[0], mode=Mode.SUBTRACT)
    add(corte_extrus_o2_tool4.solids().sort_by_distance((10.5, 2, -3.25))[0], mode=Mode.SUBTRACT)

    # Esboço20 → Corte-extrusão5 (cut)
    with BuildSketch(Plane.XY.offset(15.5)):
        with Locations((1.25, 6.5)):
            Rectangle(ESBO_O20_W, ESBO_O20_H)
    extrude(amount=-CORTE_EXTRUS_O5_DEPTH, mode=Mode.SUBTRACT)


solid = part.part
